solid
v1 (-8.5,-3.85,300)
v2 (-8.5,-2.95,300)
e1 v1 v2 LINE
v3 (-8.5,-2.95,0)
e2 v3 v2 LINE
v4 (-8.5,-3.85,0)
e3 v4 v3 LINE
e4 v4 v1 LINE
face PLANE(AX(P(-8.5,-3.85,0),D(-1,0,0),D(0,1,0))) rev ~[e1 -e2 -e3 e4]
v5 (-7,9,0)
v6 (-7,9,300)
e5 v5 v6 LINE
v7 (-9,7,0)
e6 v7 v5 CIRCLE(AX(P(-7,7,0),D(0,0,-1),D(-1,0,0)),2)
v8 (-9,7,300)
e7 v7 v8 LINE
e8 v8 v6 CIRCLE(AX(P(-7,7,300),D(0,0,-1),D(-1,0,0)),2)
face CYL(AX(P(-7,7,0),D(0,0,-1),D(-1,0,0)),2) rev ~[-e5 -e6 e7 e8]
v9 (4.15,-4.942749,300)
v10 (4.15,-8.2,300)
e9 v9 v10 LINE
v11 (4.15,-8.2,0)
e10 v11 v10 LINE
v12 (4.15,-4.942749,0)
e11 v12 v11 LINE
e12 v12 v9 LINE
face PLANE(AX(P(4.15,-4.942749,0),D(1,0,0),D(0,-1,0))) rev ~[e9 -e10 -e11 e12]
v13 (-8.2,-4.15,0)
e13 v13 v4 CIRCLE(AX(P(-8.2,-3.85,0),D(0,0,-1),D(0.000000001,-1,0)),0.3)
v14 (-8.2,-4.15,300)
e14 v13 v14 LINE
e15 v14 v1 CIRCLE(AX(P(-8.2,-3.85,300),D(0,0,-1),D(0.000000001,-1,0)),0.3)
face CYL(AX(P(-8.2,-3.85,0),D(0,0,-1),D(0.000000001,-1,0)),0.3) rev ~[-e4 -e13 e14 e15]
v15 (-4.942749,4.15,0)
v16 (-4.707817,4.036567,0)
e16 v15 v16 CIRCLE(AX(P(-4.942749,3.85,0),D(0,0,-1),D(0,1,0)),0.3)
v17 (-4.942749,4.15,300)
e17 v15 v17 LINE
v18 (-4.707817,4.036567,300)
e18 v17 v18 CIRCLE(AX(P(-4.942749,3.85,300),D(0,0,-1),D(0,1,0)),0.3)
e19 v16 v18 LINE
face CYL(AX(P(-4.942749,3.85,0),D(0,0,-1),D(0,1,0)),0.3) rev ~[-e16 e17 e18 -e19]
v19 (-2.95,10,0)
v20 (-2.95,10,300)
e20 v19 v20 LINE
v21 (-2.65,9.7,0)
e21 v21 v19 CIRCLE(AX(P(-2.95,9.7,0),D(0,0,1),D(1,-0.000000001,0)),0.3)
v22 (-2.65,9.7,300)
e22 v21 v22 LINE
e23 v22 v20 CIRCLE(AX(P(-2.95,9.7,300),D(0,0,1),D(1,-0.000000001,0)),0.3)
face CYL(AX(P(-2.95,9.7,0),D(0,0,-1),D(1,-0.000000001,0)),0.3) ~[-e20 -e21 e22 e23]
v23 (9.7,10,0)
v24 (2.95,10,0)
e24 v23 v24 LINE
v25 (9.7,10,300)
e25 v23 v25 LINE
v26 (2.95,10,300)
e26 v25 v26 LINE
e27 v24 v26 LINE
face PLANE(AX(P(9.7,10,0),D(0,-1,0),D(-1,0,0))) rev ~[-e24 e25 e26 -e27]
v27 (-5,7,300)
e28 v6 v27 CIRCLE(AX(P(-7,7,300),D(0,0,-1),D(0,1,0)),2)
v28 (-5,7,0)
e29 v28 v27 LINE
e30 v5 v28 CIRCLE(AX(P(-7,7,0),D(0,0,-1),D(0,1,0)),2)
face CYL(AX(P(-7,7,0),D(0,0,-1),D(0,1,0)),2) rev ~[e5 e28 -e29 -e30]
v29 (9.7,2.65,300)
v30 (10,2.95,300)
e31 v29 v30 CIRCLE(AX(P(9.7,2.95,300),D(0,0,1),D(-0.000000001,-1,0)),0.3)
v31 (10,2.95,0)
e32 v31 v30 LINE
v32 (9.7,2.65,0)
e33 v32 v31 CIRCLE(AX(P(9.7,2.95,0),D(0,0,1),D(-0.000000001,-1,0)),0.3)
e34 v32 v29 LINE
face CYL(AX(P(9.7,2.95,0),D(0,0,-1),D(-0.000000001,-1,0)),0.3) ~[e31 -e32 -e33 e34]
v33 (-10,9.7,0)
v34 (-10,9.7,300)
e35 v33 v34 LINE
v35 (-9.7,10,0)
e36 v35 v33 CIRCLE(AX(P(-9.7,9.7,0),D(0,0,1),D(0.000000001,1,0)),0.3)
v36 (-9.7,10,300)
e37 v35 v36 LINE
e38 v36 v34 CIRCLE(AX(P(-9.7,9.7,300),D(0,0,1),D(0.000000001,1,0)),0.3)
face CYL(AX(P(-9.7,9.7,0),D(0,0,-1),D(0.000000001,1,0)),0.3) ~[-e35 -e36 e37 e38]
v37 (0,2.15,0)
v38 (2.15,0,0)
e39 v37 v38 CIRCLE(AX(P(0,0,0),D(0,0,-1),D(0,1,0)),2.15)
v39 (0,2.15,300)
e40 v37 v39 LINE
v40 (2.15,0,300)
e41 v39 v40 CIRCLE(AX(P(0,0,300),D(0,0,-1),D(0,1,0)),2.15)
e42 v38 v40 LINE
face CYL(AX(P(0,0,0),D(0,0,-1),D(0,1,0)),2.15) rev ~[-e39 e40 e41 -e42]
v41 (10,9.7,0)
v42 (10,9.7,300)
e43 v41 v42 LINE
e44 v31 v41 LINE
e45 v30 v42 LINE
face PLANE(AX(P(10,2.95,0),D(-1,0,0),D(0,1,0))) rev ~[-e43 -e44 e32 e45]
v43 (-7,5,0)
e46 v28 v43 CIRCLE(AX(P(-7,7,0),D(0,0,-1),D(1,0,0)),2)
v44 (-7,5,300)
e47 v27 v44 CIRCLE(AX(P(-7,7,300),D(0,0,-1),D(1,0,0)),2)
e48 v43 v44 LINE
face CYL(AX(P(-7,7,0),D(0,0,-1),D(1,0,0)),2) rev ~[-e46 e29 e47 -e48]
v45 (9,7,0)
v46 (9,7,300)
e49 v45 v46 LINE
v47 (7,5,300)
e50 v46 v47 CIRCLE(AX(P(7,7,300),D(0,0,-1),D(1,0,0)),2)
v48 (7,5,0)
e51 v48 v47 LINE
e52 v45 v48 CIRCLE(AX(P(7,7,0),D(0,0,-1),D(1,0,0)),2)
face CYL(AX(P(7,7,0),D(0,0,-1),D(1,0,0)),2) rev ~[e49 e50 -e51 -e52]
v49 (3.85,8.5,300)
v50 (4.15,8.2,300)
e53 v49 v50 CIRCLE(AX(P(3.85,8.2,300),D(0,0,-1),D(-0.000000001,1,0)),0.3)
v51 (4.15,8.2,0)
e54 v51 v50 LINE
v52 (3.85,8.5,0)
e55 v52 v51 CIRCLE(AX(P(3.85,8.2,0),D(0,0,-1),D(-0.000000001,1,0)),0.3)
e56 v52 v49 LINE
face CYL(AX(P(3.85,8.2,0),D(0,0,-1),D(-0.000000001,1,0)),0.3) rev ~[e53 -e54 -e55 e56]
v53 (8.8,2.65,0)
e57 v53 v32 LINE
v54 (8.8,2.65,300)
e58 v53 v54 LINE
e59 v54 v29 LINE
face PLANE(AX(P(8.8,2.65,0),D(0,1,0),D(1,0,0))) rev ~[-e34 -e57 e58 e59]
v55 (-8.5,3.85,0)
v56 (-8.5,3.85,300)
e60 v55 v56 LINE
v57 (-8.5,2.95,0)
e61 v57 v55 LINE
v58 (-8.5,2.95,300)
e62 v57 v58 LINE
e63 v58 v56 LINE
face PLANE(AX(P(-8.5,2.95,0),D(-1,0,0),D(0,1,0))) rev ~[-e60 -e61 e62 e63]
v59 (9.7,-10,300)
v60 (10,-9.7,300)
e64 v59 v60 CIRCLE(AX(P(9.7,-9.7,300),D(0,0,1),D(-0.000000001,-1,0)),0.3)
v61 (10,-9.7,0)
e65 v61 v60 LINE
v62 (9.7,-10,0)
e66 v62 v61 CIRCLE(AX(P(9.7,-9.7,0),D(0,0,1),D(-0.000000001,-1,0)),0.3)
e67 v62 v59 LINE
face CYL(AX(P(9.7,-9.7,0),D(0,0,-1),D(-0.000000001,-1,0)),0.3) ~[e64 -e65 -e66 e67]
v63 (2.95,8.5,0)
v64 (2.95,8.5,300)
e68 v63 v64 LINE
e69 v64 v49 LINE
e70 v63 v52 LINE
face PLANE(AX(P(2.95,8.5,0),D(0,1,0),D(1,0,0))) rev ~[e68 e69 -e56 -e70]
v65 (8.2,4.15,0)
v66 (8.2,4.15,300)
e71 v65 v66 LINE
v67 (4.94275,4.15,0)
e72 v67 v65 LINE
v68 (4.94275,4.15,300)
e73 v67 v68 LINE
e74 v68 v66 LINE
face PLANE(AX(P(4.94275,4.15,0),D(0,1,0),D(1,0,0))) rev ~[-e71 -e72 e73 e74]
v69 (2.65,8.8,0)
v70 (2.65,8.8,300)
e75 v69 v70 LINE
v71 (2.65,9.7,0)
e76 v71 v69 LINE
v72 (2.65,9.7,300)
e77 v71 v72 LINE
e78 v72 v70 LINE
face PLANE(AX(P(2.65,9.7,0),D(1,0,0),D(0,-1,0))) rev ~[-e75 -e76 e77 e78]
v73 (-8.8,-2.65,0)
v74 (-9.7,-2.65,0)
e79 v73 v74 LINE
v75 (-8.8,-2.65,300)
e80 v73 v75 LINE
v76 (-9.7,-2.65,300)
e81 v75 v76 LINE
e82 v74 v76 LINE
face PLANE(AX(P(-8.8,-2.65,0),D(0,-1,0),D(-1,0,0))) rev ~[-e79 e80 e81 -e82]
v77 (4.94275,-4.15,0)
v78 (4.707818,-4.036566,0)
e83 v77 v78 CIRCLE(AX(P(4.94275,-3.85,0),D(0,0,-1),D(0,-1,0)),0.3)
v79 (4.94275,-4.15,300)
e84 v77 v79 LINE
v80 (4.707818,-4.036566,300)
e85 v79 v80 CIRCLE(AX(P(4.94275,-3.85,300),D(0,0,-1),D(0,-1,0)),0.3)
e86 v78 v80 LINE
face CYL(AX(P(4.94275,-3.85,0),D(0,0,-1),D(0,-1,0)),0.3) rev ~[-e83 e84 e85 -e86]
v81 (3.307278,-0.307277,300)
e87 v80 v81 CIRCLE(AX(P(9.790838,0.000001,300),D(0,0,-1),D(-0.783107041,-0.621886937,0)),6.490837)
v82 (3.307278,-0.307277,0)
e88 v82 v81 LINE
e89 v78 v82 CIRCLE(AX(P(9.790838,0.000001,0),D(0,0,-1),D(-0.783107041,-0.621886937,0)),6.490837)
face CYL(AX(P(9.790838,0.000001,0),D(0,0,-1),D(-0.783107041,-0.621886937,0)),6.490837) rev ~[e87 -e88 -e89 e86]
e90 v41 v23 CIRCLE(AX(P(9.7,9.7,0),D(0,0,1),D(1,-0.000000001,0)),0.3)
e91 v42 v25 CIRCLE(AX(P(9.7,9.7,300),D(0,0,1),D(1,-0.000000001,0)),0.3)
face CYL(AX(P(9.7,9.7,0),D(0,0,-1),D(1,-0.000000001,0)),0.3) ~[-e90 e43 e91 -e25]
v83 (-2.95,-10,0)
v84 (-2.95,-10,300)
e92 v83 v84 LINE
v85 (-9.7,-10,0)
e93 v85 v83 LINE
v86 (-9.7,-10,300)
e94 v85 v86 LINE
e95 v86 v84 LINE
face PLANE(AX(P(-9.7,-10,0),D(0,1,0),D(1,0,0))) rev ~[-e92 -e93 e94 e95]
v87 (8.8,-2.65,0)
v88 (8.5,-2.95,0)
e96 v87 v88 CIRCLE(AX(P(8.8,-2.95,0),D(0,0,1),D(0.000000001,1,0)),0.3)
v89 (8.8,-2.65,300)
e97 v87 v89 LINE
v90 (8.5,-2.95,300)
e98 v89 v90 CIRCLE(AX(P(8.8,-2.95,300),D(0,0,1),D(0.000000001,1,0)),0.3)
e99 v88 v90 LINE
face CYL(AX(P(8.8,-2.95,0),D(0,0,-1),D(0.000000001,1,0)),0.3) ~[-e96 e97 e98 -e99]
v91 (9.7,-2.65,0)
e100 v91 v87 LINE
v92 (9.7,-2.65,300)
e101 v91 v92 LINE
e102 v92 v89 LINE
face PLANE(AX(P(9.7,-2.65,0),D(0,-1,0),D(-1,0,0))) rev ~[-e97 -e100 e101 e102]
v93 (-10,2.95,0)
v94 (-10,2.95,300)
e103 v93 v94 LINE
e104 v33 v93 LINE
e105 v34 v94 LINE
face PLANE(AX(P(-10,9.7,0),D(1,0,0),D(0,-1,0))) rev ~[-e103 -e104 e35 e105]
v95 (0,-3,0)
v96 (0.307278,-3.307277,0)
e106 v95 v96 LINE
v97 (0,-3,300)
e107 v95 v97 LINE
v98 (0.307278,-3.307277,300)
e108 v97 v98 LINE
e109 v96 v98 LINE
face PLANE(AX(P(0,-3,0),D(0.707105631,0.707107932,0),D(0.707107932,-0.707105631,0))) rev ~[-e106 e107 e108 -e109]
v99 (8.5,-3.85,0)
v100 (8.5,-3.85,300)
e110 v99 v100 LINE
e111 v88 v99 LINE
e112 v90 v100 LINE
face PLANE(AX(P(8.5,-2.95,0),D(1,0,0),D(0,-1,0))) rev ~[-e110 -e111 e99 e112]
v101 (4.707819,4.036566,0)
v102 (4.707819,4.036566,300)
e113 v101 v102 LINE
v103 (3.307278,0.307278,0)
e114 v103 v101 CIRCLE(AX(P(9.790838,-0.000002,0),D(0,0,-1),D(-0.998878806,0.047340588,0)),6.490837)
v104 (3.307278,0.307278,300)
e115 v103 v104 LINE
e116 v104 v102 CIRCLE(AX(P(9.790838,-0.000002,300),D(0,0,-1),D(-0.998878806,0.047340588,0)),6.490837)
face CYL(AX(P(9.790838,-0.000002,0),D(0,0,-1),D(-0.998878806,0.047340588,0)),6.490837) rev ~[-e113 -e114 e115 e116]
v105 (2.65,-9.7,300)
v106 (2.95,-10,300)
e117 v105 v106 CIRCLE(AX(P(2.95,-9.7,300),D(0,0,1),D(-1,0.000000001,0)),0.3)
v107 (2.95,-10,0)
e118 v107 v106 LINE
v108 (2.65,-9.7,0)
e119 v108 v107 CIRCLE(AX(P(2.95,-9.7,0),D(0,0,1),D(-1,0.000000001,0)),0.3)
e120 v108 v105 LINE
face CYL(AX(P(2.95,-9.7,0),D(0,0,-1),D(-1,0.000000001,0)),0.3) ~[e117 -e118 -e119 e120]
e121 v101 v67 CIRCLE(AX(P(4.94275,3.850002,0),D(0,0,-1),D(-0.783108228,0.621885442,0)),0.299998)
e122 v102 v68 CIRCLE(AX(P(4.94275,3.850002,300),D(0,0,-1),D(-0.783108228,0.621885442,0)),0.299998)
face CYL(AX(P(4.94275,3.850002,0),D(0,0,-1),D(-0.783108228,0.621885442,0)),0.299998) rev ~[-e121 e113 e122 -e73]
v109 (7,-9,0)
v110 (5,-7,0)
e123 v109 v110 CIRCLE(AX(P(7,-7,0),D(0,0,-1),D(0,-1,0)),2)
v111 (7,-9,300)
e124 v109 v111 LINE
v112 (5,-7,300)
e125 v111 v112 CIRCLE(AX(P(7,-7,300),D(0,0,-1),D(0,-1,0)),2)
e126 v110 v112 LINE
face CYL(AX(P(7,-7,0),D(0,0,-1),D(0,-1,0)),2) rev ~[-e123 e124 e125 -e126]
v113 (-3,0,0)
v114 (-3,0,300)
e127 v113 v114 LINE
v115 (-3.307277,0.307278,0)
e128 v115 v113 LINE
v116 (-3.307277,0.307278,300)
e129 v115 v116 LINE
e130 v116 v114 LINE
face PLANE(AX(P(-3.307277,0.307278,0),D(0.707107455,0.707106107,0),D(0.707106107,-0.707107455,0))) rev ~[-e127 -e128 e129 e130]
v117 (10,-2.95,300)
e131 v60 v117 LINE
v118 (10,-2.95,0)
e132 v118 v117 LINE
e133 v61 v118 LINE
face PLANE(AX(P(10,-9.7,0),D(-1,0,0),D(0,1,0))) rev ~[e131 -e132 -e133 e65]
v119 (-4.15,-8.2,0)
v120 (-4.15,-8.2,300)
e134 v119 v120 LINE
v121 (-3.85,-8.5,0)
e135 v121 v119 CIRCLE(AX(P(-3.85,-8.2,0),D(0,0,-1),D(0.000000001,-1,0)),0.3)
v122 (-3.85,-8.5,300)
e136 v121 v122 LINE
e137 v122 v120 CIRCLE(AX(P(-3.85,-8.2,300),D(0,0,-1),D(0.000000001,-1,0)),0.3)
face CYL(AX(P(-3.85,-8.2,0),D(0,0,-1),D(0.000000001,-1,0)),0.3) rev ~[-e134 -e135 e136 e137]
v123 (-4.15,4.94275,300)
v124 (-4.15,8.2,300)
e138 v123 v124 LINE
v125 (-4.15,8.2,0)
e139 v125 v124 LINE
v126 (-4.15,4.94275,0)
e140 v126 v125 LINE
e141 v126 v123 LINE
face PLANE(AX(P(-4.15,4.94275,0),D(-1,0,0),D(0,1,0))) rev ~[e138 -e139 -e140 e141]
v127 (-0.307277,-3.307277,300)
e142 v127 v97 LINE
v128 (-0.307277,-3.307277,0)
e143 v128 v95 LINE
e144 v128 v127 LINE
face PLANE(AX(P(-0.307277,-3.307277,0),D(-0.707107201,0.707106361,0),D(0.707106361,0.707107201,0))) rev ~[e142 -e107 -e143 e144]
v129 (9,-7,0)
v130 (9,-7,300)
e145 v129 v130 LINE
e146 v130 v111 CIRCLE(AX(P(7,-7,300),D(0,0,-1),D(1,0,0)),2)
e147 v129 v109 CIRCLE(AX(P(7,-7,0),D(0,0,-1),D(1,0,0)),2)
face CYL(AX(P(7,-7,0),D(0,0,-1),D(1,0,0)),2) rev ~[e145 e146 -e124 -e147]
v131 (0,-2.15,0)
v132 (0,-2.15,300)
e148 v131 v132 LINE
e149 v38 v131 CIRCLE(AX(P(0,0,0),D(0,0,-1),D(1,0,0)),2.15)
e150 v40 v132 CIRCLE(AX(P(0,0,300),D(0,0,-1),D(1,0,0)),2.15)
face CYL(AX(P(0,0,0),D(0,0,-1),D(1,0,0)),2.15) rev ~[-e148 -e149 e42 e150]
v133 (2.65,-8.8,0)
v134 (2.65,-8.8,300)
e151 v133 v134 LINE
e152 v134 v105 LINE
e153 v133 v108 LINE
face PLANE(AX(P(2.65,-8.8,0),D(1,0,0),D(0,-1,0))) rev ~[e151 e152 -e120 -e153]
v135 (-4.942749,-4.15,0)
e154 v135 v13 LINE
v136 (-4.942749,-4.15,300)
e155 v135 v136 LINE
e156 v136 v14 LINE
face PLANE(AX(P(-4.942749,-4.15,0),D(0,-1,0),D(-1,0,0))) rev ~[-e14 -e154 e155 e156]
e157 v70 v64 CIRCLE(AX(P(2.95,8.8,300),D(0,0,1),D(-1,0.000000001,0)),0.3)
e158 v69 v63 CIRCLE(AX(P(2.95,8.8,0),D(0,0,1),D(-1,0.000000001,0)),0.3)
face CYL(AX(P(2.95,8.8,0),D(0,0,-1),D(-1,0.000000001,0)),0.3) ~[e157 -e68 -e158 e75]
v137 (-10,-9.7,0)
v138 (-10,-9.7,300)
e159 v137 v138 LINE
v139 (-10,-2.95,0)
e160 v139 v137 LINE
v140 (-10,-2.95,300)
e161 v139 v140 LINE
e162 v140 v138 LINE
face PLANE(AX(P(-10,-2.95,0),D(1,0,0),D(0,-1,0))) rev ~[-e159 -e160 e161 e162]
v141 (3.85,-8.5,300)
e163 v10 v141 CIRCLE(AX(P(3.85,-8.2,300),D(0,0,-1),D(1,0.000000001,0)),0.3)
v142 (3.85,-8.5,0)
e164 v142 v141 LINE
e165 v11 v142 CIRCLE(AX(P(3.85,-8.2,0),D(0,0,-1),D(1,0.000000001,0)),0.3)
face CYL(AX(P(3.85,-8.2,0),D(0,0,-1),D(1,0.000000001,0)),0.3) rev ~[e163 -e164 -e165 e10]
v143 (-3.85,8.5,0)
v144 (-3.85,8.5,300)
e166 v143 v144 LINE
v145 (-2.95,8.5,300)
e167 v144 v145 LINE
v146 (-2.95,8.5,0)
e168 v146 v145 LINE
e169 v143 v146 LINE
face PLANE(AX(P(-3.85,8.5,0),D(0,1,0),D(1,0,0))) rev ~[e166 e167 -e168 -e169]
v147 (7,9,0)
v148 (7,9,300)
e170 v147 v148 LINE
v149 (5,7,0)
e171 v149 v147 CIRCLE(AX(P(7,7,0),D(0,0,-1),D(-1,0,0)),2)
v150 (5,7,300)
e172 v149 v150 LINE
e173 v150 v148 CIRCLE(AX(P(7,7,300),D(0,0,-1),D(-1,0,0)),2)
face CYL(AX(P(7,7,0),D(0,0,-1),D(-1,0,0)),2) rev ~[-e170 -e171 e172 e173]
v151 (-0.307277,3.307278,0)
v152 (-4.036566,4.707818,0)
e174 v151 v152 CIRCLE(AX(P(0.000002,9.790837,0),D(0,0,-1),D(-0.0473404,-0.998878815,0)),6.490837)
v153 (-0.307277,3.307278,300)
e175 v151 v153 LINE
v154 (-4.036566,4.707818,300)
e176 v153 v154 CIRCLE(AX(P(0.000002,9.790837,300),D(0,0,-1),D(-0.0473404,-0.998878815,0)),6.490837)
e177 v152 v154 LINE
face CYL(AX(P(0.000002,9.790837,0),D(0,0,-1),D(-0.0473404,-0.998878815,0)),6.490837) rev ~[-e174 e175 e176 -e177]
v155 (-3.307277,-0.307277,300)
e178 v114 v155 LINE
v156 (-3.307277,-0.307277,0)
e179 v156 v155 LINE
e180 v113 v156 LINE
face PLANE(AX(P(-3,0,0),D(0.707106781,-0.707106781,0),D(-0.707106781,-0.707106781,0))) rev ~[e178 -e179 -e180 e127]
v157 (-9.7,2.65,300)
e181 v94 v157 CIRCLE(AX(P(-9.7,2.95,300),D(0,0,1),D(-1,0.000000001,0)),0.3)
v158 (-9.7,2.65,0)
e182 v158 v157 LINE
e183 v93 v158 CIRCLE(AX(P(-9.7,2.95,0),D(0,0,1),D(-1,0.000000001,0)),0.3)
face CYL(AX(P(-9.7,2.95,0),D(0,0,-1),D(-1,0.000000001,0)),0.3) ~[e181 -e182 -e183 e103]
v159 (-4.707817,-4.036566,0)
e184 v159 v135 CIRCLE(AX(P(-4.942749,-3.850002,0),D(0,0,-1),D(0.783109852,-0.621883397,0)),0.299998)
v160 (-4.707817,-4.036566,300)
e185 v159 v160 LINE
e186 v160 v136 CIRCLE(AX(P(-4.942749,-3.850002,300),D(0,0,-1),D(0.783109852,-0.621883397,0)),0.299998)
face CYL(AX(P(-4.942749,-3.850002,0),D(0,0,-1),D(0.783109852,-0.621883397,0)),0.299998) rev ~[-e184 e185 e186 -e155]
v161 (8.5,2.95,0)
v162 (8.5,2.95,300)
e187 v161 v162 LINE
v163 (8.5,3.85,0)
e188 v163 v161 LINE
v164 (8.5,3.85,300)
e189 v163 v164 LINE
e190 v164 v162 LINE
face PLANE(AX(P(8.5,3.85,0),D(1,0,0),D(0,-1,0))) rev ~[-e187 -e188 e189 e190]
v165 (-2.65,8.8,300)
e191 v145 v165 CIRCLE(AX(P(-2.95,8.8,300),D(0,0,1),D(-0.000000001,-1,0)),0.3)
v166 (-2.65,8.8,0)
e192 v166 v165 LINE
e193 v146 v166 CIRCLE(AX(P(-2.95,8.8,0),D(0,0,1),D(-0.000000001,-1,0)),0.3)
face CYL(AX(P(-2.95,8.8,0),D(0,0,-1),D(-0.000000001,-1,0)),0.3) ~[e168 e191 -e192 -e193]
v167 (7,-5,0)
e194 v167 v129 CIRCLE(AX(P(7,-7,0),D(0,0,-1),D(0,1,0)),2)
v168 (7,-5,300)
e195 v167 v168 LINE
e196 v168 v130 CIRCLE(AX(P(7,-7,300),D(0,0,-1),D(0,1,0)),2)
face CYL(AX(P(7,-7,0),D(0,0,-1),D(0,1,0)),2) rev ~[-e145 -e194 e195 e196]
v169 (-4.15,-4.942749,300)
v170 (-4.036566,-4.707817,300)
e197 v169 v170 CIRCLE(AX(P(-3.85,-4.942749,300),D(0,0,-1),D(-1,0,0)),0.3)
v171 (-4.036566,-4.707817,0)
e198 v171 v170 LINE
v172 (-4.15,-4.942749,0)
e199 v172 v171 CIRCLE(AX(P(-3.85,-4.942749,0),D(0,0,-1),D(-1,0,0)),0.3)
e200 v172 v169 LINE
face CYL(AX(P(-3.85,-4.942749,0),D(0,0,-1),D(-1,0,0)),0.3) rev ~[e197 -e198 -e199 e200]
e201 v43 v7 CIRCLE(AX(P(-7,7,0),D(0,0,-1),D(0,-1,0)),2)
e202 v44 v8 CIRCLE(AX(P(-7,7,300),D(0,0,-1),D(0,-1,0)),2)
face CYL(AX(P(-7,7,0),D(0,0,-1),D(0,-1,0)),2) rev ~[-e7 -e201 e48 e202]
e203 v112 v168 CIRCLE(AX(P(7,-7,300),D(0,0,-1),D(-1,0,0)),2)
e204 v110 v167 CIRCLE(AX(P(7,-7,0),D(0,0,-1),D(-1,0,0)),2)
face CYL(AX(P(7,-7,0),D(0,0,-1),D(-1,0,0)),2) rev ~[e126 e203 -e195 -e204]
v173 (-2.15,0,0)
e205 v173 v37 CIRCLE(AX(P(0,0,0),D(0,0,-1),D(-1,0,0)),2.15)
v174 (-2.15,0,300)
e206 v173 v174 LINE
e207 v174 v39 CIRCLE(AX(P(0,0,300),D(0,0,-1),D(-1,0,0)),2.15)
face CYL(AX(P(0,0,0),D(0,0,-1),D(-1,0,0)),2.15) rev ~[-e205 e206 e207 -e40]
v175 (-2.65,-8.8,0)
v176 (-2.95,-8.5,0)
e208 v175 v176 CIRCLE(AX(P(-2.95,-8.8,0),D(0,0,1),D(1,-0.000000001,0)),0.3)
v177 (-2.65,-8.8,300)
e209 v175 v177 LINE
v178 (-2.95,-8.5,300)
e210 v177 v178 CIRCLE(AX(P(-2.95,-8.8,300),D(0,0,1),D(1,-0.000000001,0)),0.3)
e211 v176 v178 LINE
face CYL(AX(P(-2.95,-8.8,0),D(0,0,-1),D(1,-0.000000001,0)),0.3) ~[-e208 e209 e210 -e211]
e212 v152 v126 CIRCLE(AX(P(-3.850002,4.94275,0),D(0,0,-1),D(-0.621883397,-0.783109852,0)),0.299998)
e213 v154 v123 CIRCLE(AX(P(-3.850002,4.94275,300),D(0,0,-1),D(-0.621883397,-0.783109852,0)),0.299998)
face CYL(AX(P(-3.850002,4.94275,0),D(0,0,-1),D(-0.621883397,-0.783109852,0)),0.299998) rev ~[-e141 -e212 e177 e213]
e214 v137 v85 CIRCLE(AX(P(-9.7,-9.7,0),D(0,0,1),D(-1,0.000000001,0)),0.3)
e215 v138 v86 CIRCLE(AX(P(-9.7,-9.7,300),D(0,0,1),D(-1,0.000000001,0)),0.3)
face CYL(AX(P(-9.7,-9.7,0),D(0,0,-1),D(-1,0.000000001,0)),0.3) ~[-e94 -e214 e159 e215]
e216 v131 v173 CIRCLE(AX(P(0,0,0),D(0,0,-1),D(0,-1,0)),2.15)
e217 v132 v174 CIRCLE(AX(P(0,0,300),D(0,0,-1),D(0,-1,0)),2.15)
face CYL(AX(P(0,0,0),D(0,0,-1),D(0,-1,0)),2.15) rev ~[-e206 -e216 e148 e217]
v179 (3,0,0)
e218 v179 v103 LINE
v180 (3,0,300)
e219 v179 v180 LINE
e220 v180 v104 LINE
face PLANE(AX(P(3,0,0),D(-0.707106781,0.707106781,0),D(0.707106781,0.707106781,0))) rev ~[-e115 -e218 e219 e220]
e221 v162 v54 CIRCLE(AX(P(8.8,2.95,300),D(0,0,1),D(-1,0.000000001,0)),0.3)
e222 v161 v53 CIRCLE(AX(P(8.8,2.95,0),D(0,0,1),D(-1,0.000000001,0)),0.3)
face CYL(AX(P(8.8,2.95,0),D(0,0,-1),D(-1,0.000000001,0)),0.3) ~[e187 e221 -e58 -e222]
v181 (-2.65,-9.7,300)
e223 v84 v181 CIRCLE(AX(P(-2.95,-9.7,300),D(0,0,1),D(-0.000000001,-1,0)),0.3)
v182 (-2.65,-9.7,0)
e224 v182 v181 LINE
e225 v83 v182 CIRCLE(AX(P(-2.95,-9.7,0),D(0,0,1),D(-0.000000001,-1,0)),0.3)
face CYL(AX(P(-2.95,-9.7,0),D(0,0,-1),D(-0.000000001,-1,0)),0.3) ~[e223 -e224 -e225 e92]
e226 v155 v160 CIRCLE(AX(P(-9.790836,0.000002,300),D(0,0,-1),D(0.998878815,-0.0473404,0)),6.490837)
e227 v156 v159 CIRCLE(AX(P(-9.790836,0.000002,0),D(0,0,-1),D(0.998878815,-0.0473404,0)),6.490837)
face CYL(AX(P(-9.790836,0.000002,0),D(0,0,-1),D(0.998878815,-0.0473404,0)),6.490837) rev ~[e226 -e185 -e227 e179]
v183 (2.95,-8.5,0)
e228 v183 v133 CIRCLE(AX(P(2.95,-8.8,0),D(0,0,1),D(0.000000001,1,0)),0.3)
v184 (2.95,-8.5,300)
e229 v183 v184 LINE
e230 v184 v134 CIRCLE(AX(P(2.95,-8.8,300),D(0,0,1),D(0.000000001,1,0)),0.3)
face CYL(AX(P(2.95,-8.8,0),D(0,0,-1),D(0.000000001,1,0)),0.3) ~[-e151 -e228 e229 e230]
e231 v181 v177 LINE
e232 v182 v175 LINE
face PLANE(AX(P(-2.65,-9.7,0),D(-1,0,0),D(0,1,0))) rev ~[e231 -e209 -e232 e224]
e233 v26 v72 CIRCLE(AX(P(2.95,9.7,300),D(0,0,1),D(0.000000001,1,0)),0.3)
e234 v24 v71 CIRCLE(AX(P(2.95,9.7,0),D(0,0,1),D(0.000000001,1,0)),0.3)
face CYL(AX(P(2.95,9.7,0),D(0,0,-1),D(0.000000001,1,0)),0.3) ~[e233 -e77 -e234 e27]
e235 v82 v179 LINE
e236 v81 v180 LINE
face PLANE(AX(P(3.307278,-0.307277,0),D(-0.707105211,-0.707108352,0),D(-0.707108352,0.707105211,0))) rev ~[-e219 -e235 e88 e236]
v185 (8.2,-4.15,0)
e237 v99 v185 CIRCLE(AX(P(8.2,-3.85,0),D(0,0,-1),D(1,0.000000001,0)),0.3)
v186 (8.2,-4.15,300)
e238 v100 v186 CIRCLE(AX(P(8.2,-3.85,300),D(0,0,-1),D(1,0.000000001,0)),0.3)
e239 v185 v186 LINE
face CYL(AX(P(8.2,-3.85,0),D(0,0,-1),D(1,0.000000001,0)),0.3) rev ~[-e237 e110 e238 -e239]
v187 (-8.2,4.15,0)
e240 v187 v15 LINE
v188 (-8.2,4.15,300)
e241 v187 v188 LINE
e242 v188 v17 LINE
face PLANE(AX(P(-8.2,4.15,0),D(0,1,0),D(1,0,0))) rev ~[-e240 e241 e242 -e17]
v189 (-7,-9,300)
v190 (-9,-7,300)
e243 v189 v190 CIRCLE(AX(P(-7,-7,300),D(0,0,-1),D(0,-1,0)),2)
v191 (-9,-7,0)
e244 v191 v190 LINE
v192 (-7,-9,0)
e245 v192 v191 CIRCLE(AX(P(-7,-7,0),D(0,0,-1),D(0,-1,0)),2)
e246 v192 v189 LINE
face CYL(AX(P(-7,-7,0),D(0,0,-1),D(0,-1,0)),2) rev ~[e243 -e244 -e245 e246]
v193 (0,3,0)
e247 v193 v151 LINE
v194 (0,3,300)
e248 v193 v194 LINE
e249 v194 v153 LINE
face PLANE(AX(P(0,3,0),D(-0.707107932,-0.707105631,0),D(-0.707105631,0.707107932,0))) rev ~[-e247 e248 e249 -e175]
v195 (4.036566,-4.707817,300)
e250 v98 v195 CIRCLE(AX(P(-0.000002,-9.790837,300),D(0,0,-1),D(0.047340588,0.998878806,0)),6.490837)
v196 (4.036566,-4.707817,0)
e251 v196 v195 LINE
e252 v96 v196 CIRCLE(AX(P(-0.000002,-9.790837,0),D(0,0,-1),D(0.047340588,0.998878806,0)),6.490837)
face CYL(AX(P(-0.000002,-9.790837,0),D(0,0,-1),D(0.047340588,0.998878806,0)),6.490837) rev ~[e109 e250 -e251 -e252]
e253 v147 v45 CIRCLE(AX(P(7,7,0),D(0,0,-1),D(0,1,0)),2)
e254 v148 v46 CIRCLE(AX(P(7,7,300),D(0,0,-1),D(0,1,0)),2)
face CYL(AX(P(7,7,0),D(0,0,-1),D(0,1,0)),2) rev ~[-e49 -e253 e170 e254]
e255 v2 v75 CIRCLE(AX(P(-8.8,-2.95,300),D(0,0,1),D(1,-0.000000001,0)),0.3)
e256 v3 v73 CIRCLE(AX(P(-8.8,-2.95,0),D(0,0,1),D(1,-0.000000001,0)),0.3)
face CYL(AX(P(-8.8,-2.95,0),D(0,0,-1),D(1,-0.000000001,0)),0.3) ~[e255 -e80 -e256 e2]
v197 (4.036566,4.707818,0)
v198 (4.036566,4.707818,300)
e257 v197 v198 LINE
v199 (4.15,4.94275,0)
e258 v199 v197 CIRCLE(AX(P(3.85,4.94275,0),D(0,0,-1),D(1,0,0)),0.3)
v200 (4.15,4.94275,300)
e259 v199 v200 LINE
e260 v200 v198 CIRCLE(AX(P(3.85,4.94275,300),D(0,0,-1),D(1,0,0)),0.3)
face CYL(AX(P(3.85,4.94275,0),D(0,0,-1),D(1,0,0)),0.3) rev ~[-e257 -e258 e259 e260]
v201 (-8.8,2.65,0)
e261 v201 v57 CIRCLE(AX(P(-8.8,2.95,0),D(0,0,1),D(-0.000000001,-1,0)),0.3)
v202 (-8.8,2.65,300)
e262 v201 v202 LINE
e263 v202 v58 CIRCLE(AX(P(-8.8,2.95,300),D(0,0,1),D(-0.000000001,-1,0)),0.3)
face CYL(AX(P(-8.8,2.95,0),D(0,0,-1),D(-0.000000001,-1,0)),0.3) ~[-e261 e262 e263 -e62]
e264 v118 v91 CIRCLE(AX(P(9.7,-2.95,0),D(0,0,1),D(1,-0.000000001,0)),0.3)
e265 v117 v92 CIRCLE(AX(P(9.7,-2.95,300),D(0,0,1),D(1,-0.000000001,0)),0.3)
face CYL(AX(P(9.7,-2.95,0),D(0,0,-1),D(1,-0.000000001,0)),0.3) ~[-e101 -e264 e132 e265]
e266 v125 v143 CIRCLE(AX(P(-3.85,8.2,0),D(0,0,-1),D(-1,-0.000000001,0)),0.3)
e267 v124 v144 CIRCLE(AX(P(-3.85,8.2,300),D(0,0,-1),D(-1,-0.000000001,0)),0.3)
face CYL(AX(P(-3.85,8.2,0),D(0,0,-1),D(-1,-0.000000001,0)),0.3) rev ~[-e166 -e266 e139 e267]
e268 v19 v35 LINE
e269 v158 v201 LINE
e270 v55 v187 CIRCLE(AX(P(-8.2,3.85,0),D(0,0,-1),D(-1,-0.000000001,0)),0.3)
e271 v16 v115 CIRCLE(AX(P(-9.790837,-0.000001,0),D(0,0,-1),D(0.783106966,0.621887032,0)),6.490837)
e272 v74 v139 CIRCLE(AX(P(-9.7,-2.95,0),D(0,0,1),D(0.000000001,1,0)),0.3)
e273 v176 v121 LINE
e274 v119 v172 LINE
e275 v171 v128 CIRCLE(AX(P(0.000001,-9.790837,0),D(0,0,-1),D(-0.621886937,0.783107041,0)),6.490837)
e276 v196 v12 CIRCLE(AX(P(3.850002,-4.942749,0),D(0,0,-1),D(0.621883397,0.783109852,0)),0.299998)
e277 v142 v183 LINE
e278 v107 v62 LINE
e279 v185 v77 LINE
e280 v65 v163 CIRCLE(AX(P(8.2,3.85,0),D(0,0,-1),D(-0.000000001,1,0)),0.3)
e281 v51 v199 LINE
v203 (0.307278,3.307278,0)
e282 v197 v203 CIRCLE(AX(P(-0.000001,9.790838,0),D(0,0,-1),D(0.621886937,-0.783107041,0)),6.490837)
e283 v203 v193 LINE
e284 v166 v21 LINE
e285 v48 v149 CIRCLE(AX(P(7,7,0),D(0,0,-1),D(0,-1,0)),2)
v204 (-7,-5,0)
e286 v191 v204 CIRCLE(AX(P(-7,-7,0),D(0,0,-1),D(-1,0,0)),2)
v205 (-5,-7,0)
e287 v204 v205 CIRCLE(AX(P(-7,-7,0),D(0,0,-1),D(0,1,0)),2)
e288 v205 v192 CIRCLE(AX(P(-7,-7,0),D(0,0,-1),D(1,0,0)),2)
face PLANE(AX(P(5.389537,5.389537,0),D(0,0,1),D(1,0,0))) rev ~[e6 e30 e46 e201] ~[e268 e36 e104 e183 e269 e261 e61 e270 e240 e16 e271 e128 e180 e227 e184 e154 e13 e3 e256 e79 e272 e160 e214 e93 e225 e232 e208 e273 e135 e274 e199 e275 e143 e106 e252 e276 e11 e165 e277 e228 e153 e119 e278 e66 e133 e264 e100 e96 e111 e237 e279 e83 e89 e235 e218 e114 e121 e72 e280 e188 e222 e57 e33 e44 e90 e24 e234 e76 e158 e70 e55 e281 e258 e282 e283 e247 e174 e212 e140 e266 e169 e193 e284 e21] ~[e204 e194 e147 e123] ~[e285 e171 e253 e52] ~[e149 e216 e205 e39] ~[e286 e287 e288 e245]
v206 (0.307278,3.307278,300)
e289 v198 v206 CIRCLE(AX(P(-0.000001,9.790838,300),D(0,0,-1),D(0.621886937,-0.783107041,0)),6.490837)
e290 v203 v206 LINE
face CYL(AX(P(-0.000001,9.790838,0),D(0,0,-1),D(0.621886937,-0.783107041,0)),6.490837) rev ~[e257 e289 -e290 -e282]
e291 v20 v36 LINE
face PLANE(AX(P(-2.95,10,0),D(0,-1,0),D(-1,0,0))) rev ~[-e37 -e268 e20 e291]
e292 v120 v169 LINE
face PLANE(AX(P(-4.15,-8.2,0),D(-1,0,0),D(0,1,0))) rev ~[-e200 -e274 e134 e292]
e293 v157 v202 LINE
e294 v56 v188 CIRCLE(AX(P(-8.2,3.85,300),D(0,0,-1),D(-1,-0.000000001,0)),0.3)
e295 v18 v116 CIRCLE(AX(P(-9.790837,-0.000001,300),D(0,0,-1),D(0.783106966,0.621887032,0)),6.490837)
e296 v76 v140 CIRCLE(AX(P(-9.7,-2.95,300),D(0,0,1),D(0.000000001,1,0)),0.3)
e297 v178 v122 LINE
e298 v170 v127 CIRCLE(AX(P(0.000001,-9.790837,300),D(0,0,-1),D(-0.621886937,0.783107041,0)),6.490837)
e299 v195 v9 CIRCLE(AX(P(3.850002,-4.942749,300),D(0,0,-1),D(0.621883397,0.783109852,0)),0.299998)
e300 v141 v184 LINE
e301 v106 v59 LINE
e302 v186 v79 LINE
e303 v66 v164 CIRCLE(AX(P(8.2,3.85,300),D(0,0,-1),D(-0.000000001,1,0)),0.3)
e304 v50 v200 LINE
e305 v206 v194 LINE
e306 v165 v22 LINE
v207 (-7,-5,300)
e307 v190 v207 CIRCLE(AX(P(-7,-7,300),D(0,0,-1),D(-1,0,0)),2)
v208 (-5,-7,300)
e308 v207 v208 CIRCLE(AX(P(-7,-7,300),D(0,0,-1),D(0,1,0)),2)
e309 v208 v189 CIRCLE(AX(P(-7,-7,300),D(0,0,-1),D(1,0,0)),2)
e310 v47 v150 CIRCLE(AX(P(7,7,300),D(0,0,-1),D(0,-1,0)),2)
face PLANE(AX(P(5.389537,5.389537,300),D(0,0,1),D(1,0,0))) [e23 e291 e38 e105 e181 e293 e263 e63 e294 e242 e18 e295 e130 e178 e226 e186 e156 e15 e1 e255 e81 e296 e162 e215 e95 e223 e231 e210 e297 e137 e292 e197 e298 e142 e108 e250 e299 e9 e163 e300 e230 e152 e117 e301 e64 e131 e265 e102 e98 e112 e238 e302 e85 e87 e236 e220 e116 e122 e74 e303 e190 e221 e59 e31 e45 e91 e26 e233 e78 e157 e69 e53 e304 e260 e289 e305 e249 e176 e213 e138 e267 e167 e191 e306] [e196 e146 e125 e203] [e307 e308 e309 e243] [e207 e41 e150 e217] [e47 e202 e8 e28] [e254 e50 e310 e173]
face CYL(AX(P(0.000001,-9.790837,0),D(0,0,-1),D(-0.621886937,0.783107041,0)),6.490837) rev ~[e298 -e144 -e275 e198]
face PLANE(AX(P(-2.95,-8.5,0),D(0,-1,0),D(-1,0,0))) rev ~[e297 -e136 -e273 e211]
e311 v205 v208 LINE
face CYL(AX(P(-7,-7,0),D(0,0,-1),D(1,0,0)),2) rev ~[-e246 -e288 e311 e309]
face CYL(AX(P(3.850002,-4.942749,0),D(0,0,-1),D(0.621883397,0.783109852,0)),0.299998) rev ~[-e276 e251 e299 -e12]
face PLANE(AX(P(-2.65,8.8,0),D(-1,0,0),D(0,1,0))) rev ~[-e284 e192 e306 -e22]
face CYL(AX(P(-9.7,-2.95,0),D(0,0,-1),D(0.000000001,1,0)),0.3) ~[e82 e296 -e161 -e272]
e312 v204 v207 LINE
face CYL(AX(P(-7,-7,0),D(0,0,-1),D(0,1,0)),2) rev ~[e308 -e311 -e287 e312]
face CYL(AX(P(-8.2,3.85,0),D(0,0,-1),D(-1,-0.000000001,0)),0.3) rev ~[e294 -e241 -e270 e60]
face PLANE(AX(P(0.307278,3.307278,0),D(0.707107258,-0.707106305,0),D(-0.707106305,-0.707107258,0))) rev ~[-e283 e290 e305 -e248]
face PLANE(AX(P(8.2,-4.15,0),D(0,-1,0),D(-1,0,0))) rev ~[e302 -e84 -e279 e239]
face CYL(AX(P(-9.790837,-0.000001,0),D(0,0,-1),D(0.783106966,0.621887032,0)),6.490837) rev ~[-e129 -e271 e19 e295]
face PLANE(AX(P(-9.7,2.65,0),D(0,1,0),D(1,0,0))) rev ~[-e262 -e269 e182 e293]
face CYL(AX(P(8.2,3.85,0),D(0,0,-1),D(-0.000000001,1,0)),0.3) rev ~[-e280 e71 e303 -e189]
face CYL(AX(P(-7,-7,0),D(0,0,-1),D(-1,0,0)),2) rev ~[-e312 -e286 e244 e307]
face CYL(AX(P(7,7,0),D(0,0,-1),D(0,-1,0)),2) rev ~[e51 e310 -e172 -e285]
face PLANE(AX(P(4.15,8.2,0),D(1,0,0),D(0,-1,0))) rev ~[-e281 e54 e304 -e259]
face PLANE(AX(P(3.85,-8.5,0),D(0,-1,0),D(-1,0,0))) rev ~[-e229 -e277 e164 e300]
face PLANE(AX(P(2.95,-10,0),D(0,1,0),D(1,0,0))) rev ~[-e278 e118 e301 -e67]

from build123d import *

# Parameters (mm, degrees)
F1_DEPTH = 300


# Not quite as in the source:
# - ends of sketch curves that miss each other by under 0.0002 mm in the source are joined


with BuildPart() as f1:
    # F0 (on Top) → F1 (new body)
    with BuildSketch(Plane.XY):
        with BuildLine():
            ThreePointArc((0, 2.15), (1.5202795796, 1.5202795796), (2.15, 0))
            Line((2.15, 0), (3, 0))
            Line((3, 0), (3.307278, 0.307278))
            ThreePointArc((3.307278, 0.307278), (3.7143803747, 2.2820219924), (4.7078187099, 4.0365664363))
            ThreePointArc((4.7078187099, 4.0365664363), (4.812308461, 4.1201573706), (4.94275, 4.15))
            Line((4.94275, 4.15), (8.2, 4.15))
            ThreePointArc((8.2, 4.15), (8.4121320344, 4.0621320344), (8.5, 3.85))
            Line((8.5, 3.85), (8.5, 2.95))
            ThreePointArc((8.5, 2.95), (8.5878679656, 2.7378679656), (8.8, 2.65))
            Line((8.8, 2.65), (9.7, 2.65))
            ThreePointArc((9.7, 2.65), (9.9121320344, 2.7378679656), (10, 2.95))
            Line((10, 2.95), (10, 9.7))
            ThreePointArc((10, 9.7), (9.9121320344, 9.9121320344), (9.7, 10))
            Line((9.7, 10), (2.95, 10))
            ThreePointArc((2.95, 10), (2.7378679656, 9.9121320344), (2.65, 9.7))
            Line((2.65, 9.7), (2.65, 8.8))
            ThreePointArc((2.65, 8.8), (2.7378679656, 8.5878679656), (2.95, 8.5))
            Line((2.95, 8.5), (3.85, 8.5))
            ThreePointArc((3.85, 8.5), (4.0621320344, 8.4121320344), (4.15, 8.2))
            Line((4.15, 8.2), (4.15, 4.94275))
            ThreePointArc((4.15, 4.94275), (4.1201572004, 4.8123081084), (4.036566086, 4.7078178916))
            ThreePointArc((4.036566086, 4.7078178916), (2.2820216259, 3.7143802371), (0.3072779813, 3.3072783955))
            Line((0.3072779813, 3.3072783955), (0, 3))
            Line((0, 3), (0, 2.15))
        make_face()
        with BuildLine():
            ThreePointArc((7, 9), (8.4142135624, 8.4142135624), (9, 7))
            ThreePointArc((9, 7), (8.4142135624, 5.5857864376), (7, 5))
            ThreePointArc((7, 5), (5.5857864376, 5.5857864376), (5, 7))
            ThreePointArc((5, 7), (5.5857864376, 8.4142135624), (7, 9))
        make_face(mode=Mode.SUBTRACT)
        with BuildLine():
            Line((3, 0), (2.15, 0))
            ThreePointArc((2.15, 0), (1.5202795796, -1.5202795796), (0, -2.15))
            Line((0, -2.15), (0, -3))
            Line((0, -3), (0.307278, -3.307277))
            ThreePointArc((0.307278, -3.307277), (2.2820216259, -3.7143792371), (4.036565823, -4.7078172229))
            ThreePointArc((4.036565823, -4.7078172229), (4.1201572004, -4.8123071084), (4.15, -4.942749))
            Line((4.15, -4.942749), (4.15, -8.2))
            ThreePointArc((4.15, -8.2), (4.0621320344, -8.4121320344), (3.85, -8.5))
            Line((3.85, -8.5), (2.95, -8.5))
            ThreePointArc((2.95, -8.5), (2.7378679656, -8.5878679656), (2.65, -8.8))
            Line((2.65, -8.8), (2.65, -9.7))
            ThreePointArc((2.65, -9.7), (2.7378679656, -9.9121320344), (2.95, -10))
            Line((2.95, -10), (9.7, -10))
            ThreePointArc((9.7, -10), (9.9121320344, -9.9121320344), (10, -9.7))
            Line((10, -9.7), (10, -2.95))
            ThreePointArc((10, -2.95), (9.9121320344, -2.7378679656), (9.7, -2.65))
            Line((9.7, -2.65), (8.8, -2.65))
            ThreePointArc((8.8, -2.65), (8.5878679656, -2.7378679656), (8.5, -2.95))
            Line((8.5, -2.95), (8.5, -3.85))
            ThreePointArc((8.5, -3.85), (8.4121320344, -4.0621320344), (8.2, -4.15))
            Line((8.2, -4.15), (4.94275, -4.15))
            ThreePointArc((4.94275, -4.15), (4.8123081084, -4.1201572004), (4.7078178916, -4.036566086))
            ThreePointArc((4.7078178916, -4.036566086), (3.7143800615, -2.2820211583), (3.3072783483, -0.3072769835))
            Line((3.3072783483, -0.3072769835), (3, 0))
        make_face()
        with BuildLine():
            ThreePointArc((7, -5), (8.4142135624, -5.5857864376), (9, -7))
            ThreePointArc((9, -7), (8.4142135624, -8.4142135624), (7, -9))
            ThreePointArc((7, -9), (5.5857864376, -8.4142135624), (5, -7))
            ThreePointArc((5, -7), (5.5857864376, -5.5857864376), (7, -5))
        make_face(mode=Mode.SUBTRACT)
        with BuildLine():
            ThreePointArc((-2.15, 0), (-1.5202795796, 1.5202795796), (0, 2.15))
            Line((0, 2.15), (0, 3))
            Line((0, 3), (-0.307277, 3.307278))
            ThreePointArc((-0.307277, 3.307278), (-2.2820211583, 3.7143800615), (-4.036565823, 4.7078182229))
            ThreePointArc((-4.036565823, 4.7078182229), (-4.1201572004, 4.8123081084), (-4.15, 4.94275))
            Line((-4.15, 4.94275), (-4.15, 8.2))
            ThreePointArc((-4.15, 8.2), (-4.0621320344, 8.4121320344), (-3.85, 8.5))
            Line((-3.85, 8.5), (-2.95, 8.5))
            ThreePointArc((-2.95, 8.5), (-2.7378679656, 8.5878679656), (-2.65, 8.8))
            Line((-2.65, 8.8), (-2.65, 9.7))
            ThreePointArc((-2.65, 9.7), (-2.7378679656, 9.9121320344), (-2.95, 10))
            Line((-2.95, 10), (-9.7, 10))
            ThreePointArc((-9.7, 10), (-9.9121320344, 9.9121320344), (-10, 9.7))
            Line((-10, 9.7), (-10, 2.95))
            ThreePointArc((-10, 2.95), (-9.9121320344, 2.7378679656), (-9.7, 2.65))
            Line((-9.7, 2.65), (-8.8, 2.65))
            ThreePointArc((-8.8, 2.65), (-8.5878679656, 2.7378679656), (-8.5, 2.95))
            Line((-8.5, 2.95), (-8.5, 3.85))
            ThreePointArc((-8.5, 3.85), (-8.4121320344, 4.0621320344), (-8.2, 4.15))
            Line((-8.2, 4.15), (-4.942749, 4.15))
            ThreePointArc((-4.942749, 4.15), (-4.812307461, 4.1201573706), (-4.7078173786, 4.0365666993))
            ThreePointArc((-4.7078173786, 4.0365666993), (-3.7143793747, 2.2820219924), (-3.3072773955, 0.3072779813))
            Line((-3.3072773955, 0.3072779813), (-3, 0))
            Line((-3, 0), (-2.15, 0))
        make_face()
        with BuildLine():
            ThreePointArc((-7, 5), (-8.4142135624, 5.5857864376), (-9, 7))
            ThreePointArc((-9, 7), (-8.4142135624, 8.4142135624), (-7, 9))
            ThreePointArc((-7, 9), (-5.5857864376, 8.4142135624), (-5, 7))
            ThreePointArc((-5, 7), (-5.5857864376, 5.5857864376), (-7, 5))
        make_face(mode=Mode.SUBTRACT)
        with BuildLine():
            Line((0, -3), (0, -2.15))
            ThreePointArc((0, -2.15), (-1.5202795796, -1.5202795796), (-2.15, 0))
            Line((-2.15, 0), (-3, 0))
            Line((-3, 0), (-3.307277, -0.307277))
            ThreePointArc((-3.307277, -0.307277), (-3.7143790615, -2.2820211583), (-4.7078172229, -4.036565823))
            ThreePointArc((-4.7078172229, -4.036565823), (-4.8123071084, -4.1201572004), (-4.942749, -4.15))
            Line((-4.942749, -4.15), (-8.2, -4.15))
            ThreePointArc((-8.2, -4.15), (-8.4121320344, -4.0621320344), (-8.5, -3.85))
            Line((-8.5, -3.85), (-8.5, -2.95))
            ThreePointArc((-8.5, -2.95), (-8.5878679656, -2.7378679656), (-8.8, -2.65))
            Line((-8.8, -2.65), (-9.7, -2.65))
            ThreePointArc((-9.7, -2.65), (-9.9121320344, -2.7378679656), (-10, -2.95))
            Line((-10, -2.95), (-10, -9.7))
            ThreePointArc((-10, -9.7), (-9.9121320344, -9.9121320344), (-9.7, -10))
            Line((-9.7, -10), (-2.95, -10))
            ThreePointArc((-2.95, -10), (-2.7378679656, -9.9121320344), (-2.65, -9.7))
            Line((-2.65, -9.7), (-2.65, -8.8))
            ThreePointArc((-2.65, -8.8), (-2.7378679656, -8.5878679656), (-2.95, -8.5))
            Line((-2.95, -8.5), (-3.85, -8.5))
            ThreePointArc((-3.85, -8.5), (-4.0621320344, -8.4121320344), (-4.15, -8.2))
            Line((-4.15, -8.2), (-4.15, -4.942749))
            ThreePointArc((-4.15, -4.942749), (-4.1201572004, -4.8123071084), (-4.036566086, -4.7078168916))
            ThreePointArc((-4.036566086, -4.7078168916), (-2.2820211583, -3.7143790615), (-0.3072769835, -3.3072773483))
            Line((-0.3072769835, -3.3072773483), (0, -3))
        make_face()
        with BuildLine():
            ThreePointArc((-7, -9), (-8.4142135624, -8.4142135624), (-9, -7))
            ThreePointArc((-9, -7), (-8.4142135624, -5.5857864376), (-7, -5))
            ThreePointArc((-7, -5), (-5.5857864376, -5.5857864376), (-5, -7))
            ThreePointArc((-5, -7), (-5.5857864376, -8.4142135624), (-7, -9))
        make_face(mode=Mode.SUBTRACT)
    extrude(amount=F1_DEPTH)


solid = f1.part
